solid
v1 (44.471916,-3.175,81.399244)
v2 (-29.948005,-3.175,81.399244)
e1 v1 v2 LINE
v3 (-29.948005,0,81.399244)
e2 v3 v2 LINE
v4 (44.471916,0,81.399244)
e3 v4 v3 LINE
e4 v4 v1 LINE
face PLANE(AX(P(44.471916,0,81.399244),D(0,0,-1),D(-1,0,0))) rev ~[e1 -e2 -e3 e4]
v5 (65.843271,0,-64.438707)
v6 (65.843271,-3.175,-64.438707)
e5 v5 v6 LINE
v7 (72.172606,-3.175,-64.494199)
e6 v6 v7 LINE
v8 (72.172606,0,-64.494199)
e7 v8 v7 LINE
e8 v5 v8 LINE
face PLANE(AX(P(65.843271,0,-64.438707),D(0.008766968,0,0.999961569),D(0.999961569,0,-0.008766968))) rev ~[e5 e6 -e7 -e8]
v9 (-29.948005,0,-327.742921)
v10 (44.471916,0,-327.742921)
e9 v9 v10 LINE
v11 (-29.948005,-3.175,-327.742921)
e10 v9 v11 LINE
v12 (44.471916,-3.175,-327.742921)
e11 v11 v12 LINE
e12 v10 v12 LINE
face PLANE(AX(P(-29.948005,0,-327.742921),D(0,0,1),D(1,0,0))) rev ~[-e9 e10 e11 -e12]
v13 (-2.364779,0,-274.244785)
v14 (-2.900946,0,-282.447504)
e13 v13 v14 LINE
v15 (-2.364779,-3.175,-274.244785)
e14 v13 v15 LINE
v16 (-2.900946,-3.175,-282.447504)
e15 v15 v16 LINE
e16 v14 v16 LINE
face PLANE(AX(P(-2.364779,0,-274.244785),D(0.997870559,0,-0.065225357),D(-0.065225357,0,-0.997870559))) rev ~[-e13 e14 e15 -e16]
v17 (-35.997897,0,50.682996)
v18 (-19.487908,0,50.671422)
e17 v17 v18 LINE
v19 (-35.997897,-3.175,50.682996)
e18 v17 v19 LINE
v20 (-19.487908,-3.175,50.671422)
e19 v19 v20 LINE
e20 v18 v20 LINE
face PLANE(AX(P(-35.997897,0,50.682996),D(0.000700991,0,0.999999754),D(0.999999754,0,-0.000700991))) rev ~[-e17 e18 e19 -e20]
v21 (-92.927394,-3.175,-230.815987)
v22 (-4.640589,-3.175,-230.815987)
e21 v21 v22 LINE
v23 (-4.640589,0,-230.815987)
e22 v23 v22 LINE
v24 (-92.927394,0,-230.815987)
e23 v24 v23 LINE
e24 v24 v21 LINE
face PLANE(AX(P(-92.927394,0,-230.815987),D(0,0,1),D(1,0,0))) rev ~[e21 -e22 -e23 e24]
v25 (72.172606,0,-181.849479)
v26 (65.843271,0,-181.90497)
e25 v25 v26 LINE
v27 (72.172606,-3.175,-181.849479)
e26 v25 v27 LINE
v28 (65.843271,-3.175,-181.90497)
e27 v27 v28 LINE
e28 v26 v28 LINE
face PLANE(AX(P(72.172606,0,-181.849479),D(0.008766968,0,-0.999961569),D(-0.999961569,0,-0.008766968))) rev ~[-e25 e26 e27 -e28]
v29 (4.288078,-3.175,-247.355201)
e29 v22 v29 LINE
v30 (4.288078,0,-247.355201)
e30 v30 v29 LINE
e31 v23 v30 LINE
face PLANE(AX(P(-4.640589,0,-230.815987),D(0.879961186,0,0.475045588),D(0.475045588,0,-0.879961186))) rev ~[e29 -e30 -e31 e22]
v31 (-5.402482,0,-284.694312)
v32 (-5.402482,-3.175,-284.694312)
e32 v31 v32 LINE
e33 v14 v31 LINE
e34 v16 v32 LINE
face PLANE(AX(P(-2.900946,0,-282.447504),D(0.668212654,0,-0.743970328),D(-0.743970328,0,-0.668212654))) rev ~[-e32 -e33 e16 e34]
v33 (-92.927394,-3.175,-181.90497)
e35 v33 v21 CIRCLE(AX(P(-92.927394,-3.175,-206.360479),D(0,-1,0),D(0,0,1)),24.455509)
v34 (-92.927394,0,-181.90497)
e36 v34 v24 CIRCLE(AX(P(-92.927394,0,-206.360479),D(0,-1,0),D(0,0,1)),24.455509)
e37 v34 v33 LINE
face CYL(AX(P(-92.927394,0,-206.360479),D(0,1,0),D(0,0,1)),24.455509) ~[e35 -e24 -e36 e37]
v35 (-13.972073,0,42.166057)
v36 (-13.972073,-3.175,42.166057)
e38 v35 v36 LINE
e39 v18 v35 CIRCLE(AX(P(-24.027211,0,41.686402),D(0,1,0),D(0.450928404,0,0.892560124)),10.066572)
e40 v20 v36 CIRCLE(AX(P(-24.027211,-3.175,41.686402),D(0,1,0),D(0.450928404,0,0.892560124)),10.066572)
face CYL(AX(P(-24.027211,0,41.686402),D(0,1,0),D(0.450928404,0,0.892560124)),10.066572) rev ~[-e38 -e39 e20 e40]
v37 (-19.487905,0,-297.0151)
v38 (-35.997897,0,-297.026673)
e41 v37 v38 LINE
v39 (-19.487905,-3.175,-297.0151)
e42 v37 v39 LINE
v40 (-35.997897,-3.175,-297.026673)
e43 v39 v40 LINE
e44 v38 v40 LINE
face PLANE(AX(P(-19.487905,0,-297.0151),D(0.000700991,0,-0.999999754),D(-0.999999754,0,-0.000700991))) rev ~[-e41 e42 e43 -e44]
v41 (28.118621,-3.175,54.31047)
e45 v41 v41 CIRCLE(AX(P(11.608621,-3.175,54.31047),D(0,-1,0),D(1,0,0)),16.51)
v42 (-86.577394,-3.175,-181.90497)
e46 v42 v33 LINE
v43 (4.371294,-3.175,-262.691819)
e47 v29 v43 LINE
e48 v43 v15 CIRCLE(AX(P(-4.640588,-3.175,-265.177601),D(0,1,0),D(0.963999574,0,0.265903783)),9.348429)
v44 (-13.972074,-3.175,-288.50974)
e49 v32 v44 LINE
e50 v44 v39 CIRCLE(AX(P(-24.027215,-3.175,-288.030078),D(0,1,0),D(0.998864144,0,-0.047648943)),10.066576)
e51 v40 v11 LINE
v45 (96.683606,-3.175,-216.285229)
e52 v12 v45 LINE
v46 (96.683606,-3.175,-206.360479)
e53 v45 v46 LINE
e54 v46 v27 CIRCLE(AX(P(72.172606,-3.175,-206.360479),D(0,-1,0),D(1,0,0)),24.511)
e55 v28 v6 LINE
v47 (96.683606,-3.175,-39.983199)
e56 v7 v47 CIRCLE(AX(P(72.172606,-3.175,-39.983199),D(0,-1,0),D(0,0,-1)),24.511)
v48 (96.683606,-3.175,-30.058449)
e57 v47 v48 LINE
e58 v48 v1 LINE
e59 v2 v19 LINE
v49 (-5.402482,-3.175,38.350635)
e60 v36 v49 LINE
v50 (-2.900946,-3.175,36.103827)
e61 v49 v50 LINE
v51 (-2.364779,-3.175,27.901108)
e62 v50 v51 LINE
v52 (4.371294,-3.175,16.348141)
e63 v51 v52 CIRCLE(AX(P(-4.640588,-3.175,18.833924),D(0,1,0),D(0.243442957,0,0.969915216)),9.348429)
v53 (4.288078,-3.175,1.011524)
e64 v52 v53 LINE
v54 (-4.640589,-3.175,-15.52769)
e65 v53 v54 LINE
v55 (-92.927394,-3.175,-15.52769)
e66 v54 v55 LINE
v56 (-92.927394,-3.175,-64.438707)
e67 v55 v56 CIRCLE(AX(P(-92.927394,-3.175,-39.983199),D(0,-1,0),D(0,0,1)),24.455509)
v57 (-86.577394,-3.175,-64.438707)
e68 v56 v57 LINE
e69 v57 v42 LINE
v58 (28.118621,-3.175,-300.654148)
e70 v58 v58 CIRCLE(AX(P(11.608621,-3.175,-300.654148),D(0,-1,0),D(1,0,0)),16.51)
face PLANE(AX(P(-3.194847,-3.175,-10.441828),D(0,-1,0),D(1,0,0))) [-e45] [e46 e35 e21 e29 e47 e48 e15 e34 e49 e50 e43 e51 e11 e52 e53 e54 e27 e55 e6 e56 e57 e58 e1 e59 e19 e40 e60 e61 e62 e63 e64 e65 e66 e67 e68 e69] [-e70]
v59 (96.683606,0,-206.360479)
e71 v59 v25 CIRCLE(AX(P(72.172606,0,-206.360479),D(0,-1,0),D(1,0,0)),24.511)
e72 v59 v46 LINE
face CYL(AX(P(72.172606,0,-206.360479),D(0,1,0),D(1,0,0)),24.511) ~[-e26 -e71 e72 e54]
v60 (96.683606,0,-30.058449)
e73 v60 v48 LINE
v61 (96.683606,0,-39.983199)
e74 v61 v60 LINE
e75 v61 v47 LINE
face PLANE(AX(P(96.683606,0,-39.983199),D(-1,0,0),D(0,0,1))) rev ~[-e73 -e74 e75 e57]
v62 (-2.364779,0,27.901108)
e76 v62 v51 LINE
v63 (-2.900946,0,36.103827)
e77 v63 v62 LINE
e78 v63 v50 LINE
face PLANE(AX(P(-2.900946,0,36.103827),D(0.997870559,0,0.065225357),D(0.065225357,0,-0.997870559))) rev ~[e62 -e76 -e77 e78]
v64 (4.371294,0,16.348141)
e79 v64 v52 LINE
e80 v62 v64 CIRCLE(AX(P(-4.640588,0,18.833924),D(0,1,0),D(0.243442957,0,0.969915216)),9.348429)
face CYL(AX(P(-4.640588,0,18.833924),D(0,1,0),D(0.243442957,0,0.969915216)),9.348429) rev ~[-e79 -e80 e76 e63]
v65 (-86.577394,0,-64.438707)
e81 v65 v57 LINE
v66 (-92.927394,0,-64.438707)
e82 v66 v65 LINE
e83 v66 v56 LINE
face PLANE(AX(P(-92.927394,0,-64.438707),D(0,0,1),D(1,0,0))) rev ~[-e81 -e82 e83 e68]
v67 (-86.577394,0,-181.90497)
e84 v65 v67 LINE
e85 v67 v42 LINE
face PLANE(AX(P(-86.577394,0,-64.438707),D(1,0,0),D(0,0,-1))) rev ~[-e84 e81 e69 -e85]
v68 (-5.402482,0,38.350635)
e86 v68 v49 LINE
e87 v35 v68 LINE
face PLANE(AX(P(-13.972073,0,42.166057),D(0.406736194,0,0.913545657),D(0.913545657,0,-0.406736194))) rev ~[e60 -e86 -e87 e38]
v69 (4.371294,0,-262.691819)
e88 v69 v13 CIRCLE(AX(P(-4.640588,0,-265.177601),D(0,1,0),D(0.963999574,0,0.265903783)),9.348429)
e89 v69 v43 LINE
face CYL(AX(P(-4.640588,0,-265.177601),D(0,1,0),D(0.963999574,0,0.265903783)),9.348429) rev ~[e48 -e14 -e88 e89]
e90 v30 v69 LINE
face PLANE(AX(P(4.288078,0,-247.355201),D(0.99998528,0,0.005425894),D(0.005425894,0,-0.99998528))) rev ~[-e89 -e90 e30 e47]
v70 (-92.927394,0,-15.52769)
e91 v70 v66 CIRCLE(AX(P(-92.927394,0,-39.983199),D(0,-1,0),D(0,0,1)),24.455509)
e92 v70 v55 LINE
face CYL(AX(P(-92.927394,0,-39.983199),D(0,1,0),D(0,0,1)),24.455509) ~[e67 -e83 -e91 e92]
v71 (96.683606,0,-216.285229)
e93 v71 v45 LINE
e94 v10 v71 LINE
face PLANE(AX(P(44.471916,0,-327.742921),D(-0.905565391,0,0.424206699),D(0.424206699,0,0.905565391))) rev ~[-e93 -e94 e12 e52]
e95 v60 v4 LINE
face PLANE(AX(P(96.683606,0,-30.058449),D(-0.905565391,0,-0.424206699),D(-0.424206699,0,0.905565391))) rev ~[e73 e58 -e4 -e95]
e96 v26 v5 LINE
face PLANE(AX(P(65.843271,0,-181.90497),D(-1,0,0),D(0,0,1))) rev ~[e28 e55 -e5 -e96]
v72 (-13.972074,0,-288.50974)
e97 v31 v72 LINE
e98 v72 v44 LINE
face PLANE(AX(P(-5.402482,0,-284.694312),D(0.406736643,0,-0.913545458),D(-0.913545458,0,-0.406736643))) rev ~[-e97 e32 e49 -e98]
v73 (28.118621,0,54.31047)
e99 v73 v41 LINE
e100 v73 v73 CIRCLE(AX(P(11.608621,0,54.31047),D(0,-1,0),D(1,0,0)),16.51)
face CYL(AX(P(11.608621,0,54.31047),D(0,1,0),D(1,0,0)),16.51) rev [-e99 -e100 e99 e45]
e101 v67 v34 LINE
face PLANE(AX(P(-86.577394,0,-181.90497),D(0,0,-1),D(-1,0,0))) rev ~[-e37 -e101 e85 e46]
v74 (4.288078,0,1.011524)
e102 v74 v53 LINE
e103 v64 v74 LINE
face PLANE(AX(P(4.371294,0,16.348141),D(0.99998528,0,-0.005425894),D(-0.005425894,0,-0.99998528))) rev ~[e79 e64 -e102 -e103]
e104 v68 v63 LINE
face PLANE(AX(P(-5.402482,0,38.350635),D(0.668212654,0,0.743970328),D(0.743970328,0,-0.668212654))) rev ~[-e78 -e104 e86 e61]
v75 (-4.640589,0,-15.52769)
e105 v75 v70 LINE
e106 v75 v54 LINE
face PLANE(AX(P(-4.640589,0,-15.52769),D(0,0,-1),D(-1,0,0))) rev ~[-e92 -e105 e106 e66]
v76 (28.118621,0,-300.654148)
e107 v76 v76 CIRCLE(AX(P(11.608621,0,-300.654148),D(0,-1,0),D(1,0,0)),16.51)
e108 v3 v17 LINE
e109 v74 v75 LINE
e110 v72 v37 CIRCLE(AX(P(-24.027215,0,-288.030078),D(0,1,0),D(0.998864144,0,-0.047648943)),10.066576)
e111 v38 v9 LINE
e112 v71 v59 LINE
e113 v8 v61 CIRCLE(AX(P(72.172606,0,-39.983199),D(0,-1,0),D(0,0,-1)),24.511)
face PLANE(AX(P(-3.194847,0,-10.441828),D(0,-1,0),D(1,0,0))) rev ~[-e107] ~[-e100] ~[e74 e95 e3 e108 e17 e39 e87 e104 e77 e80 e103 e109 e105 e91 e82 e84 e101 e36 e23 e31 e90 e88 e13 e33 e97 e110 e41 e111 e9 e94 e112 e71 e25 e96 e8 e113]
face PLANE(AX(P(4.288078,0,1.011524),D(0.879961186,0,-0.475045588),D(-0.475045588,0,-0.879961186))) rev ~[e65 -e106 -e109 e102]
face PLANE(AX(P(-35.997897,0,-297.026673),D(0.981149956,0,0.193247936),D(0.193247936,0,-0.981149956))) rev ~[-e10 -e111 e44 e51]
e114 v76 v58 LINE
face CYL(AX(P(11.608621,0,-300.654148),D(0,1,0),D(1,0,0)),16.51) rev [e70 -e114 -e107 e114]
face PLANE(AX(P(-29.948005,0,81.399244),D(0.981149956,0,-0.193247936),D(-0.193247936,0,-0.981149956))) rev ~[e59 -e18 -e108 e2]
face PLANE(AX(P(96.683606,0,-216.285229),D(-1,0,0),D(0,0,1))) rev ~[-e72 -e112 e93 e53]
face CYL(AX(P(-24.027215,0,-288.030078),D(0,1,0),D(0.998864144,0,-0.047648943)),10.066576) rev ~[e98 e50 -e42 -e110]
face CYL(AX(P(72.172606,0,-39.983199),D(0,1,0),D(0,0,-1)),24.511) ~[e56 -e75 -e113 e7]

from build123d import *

# Parameters (mm, degrees)
F0_R     = 16.51
F0_W     = 152.420665353
F0_H     = 90.8812
F1_DEPTH = 3.175


# Not quite as in the source:
# - ends of sketch curves that miss each other by under 0.0002 mm in the source are joined
# - a feature names something its author has since deleted; it is built from what else it names


with BuildPart() as f1:
    # F0 (on Front) → F1 (new body)
    with BuildSketch(Plane.XZ):
        with BuildLine():
            Line((65.843271404, -64.4387074201), (72.172606051, -64.494198626))
            ThreePointArc((72.172606051, -64.494198626), (89.5045003647, -57.3150929397), (96.683606051, -39.983198626))
            Line((96.683606051, -39.983198626), (96.683606051, -30.0584486086))
            Line((96.683606051, -30.0584486086), (44.4719158113, 81.3992435336))
            Line((44.4719158113, 81.3992435336), (-29.9480052508, 81.3992435336))
            Line((-29.9480052508, 81.3992435336), (-35.9978974571, 50.6829957967))
            Line((-35.9978974571, 50.6829957967), (-19.4879078689, 50.6714224456))
            ThreePointArc((-19.4879078689, 50.6714224456), (-15.5812211009, 47.1637298884), (-13.9720730804, 42.1660573792))
            Line((-13.9720730804, 42.1660573792), (-5.4024819992, 38.3506346508))
            Line((-5.4024819992, 38.3506346508), (-2.9009456417, 36.1038269705))
            Line((-2.9009456417, 36.1038269705), (-2.3647786124, 27.9011076368))
            ThreePointArc((-2.3647786124, 27.9011076368), (3.4353485173, 23.5426794776), (4.3712937617, 16.3481414632))
            Line((4.3712937617, 16.3481414632), (4.2880776677, 1.0115236557))
            Line((4.2880776677, 1.0115236557), (-4.6405893252, -15.5276898319))
            Line((-4.6405893252, -15.5276898319), (-92.927393949, -15.5276898319))
            ThreePointArc((-92.927393949, -15.5276898319), (-117.3829027431, -39.983198626), (-92.927393949, -64.4387074201))
            Line((-92.927393949, -64.4387074201), (-86.577393949, -64.4387074201))
            Line((-86.577393949, -64.4387074201), (-86.577393949, -77.7312386201))
            Line((-86.577393949, -77.7312386201), (65.843271404, -77.7312386201))
            Line((65.843271404, -77.7312386201), (65.843271404, -64.4387074201))
        make_face()
        with Locations((11.6086210255, 54.3104703533)):
            Circle(F0_R, mode=Mode.SUBTRACT)
        with Locations((-10.3670612725, -123.1718386201)):
            Rectangle(F0_W, F0_H)
        with BuildLine():
            Line((65.843271404, -181.9049698201), (65.843271404, -168.6124386201))
            Line((65.843271404, -168.6124386201), (-86.577393949, -168.6124386201))
            Line((-86.577393949, -168.6124386201), (-86.577393949, -181.9049698201))
            Line((-86.577393949, -181.9049698201), (-92.927393949, -181.9049698201))
            ThreePointArc((-92.927393949, -181.9049698201), (-117.3829027431, -206.3604786142), (-92.927393949, -230.8159874083))
            Line((-92.927393949, -230.8159874083), (-4.6405893252, -230.8159874083))
            Line((-4.6405893252, -230.8159874083), (4.2880776677, -247.355200896))
            Line((4.2880776677, -247.355200896), (4.3712937617, -262.6918187035))
            ThreePointArc((4.3712937617, -262.6918187035), (3.4353485173, -269.8863567179), (-2.3647786124, -274.2447848771))
            Line((-2.3647786124, -274.2447848771), (-2.9009456417, -282.4475042108))
            Line((-2.9009456417, -282.4475042108), (-5.4024819992, -284.6943118911))
            Line((-5.4024819992, -284.6943118911), (-13.9720735102, -288.5097398532))
            ThreePointArc((-13.9720735102, -288.5097398532), (-15.5812211009, -293.5074071287), (-19.487905219, -297.0150996841))
            Line((-19.487905219, -297.0150996841), (-35.9978974571, -297.026673037))
            Line((-35.9978974571, -297.026673037), (-29.9480052508, -327.7429207739))
            Line((-29.9480052508, -327.7429207739), (44.4719158113, -327.7429207739))
            Line((44.4719158113, -327.7429207739), (96.683606051, -216.2852286317))
            Line((96.683606051, -216.2852286317), (96.683606051, -206.3604786142))
            ThreePointArc((96.683606051, -206.3604786142), (89.5045003647, -189.0285843006), (72.172606051, -181.8494786142))
            Line((72.172606051, -181.8494786142), (65.843271404, -181.9049698201))
        make_face()
        with Locations((11.6086210255, -300.6541475936)):
            Circle(F0_R, mode=Mode.SUBTRACT)
    extrude(amount=F1_DEPTH)


solid = f1.part
